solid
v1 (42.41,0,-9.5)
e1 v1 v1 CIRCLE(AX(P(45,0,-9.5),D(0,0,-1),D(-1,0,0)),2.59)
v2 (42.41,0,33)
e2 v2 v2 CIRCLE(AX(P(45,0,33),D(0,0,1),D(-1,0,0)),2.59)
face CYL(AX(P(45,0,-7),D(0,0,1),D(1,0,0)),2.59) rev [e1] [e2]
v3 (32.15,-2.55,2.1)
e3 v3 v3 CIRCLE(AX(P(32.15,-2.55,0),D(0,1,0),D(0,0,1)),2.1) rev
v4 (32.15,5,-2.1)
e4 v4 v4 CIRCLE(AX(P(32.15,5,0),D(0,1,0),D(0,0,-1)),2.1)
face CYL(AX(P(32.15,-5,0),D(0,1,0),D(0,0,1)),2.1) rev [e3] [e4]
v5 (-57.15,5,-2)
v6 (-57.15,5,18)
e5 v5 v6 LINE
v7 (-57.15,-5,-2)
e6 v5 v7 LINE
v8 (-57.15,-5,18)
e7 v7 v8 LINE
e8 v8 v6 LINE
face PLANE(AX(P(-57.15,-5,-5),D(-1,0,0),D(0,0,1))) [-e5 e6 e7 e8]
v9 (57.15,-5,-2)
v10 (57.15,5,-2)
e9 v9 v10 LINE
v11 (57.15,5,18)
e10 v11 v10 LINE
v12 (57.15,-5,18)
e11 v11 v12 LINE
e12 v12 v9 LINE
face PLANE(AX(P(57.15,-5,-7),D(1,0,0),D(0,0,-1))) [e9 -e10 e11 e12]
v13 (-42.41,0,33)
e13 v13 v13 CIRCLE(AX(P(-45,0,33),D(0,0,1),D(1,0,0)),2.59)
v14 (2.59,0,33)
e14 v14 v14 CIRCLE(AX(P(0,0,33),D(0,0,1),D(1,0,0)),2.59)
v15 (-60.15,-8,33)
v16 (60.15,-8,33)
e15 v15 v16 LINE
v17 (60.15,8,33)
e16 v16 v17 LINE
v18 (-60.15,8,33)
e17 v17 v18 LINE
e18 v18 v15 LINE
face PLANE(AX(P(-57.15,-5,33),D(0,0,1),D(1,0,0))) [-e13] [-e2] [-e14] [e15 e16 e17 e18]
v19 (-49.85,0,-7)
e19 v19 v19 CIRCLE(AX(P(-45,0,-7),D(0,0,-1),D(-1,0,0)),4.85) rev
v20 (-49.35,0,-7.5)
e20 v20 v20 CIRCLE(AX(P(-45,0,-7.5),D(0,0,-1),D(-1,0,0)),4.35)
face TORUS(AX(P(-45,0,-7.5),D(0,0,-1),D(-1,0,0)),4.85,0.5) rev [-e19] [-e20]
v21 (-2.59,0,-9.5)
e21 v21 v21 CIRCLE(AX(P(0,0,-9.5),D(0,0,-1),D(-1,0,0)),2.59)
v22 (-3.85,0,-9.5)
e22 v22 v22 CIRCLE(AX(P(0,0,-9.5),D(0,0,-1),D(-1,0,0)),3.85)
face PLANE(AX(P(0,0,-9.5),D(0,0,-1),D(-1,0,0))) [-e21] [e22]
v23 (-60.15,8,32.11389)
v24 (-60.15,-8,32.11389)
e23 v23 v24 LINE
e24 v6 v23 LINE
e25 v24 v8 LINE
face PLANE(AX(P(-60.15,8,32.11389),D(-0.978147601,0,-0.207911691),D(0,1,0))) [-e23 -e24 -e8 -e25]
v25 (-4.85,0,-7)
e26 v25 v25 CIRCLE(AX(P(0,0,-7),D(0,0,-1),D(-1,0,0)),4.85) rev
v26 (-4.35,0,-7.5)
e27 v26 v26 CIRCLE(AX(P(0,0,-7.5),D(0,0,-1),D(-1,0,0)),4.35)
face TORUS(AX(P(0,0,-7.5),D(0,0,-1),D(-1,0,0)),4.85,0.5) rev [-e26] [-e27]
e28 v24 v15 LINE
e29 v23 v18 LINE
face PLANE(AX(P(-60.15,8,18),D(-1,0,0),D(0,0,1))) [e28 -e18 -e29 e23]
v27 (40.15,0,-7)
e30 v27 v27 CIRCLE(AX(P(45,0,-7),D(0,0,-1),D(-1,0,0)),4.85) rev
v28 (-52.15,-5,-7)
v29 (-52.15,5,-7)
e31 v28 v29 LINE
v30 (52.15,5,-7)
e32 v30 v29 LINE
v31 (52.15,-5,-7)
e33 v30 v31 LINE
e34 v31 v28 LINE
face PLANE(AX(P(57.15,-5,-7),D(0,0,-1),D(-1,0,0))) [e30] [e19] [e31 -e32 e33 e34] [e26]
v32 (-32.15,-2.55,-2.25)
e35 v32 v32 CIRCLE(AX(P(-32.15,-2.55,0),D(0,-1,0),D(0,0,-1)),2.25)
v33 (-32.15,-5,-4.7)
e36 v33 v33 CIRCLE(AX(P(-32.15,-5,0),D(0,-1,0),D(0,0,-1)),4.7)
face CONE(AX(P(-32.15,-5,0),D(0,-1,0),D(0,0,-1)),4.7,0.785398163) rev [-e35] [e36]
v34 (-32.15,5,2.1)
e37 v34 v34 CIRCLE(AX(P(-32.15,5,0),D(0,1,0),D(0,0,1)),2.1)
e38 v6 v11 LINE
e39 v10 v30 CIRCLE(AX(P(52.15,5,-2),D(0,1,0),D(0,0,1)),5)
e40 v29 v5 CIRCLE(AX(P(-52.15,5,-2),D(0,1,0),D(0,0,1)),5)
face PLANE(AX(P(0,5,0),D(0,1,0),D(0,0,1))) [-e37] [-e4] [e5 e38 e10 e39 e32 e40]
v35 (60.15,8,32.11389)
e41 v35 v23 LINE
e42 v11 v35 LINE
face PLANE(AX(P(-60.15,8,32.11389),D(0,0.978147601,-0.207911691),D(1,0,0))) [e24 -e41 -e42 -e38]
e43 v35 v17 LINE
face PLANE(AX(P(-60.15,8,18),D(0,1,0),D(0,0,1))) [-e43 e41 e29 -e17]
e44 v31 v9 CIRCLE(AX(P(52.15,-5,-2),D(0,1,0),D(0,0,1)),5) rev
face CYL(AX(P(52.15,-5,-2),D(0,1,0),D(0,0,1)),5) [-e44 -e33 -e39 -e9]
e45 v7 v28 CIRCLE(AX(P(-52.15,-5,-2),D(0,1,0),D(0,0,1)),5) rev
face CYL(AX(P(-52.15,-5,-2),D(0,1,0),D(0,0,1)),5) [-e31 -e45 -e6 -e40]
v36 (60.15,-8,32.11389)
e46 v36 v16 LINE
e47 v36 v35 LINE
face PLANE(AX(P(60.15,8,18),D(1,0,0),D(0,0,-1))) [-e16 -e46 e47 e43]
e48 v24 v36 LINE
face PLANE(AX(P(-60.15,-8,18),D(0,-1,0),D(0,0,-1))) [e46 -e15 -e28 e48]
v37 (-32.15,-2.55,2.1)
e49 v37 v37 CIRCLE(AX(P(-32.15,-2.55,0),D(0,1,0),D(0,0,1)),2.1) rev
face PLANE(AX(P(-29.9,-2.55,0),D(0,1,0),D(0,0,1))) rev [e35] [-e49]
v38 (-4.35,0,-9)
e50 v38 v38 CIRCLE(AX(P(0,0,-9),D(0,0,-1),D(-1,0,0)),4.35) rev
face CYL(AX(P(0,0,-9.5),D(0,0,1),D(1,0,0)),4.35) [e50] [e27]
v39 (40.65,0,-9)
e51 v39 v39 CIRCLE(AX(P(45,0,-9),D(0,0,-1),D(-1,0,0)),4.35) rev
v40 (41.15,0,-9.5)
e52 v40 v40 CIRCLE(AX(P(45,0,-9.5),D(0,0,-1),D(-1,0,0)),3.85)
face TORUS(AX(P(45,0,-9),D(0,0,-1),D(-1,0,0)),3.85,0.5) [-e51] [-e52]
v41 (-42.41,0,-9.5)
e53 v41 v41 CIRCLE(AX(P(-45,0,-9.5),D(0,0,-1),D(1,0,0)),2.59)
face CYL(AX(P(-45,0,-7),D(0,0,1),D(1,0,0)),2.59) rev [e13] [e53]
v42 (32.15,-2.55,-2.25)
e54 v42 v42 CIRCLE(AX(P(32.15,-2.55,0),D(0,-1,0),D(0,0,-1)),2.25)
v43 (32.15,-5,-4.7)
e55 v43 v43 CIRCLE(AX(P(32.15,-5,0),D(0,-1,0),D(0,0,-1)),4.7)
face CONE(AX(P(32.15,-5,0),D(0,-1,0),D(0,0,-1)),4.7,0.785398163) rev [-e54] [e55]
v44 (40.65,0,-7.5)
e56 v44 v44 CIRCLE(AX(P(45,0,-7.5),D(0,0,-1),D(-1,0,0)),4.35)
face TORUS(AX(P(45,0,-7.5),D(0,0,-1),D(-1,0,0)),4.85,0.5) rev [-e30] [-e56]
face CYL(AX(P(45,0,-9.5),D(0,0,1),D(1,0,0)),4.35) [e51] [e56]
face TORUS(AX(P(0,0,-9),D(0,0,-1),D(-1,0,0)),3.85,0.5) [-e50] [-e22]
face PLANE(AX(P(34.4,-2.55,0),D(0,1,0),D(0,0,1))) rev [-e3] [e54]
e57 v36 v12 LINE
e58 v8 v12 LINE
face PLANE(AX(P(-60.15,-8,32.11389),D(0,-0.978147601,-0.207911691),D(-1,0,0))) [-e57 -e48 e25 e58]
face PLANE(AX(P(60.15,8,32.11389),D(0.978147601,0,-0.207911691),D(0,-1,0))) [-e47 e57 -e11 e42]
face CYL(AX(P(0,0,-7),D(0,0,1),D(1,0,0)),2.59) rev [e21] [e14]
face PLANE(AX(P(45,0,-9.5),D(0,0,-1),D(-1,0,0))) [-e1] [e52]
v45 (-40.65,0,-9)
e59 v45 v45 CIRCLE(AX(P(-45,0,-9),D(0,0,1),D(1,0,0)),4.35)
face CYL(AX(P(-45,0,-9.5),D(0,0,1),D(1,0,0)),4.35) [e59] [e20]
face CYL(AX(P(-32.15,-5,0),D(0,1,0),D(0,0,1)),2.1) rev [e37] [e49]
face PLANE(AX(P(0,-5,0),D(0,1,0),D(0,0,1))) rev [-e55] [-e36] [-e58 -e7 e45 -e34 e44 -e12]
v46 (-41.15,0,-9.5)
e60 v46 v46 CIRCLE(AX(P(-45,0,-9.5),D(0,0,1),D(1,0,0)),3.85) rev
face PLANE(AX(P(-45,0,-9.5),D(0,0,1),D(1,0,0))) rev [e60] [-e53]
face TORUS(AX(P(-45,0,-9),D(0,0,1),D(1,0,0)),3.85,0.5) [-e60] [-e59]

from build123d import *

# Parameters (mm, degrees)
BOSS_EXTRUDE1_DEPTH      = 5
BOSS_EXTRUDE1_DEPTH_BACK = 5
SKETCH2_R                = 2.1
FILLET1_R                = 5
SKETCH14_W               = 120.3
SKETCH14_H               = 16
BOSS_EXTRUDE3_DEPTH      = 15
F_5MBOLTS_DEPTH          = 70.07258863
F_5MBOLTS_DEPTH_BACK     = 70.07258863
SKETCH12_R               = 2.59
SKETCH13_R               = 4.35
SKETCH13_R_2             = 2.59
TOPWASHER_DEPTH          = 2.5
WASHERFILLET_R           = 0.5
CHAMFER1_SIZE            = 3
CHAMFER1_SIZE_2          = 14.113890328


# Read off the part's stored shape, not the designer's step: AdvancedHole1, AdvancedHole2
with BuildPart() as part:
    # Sketch2 → Boss-Extrude1 (new, two sides: drawn at the far end of the back side and taken through both)
    with BuildSketch(Plane(origin=(0, 0, 0), x_dir=(1, 0, 0), z_dir=(0, 1, 0)).offset(-BOSS_EXTRUDE1_DEPTH_BACK)):
        Polygon((-57.15, 5), (-57.15, -33), (57.15, -33), (57.15, 5), (57.15, 7), (-57.15, 7), align=None)
        with Locations(Location((-32.15, 0, 0), (0, 0, 270))):
            Circle(SKETCH2_R, mode=Mode.SUBTRACT)
        with Locations(Location((32.15, 0, 0), (0, 0, 90))):
            Circle(SKETCH2_R, mode=Mode.SUBTRACT)
    extrude(amount=BOSS_EXTRUDE1_DEPTH + BOSS_EXTRUDE1_DEPTH_BACK)

    # AdvancedHole1 outline → AdvancedHole1 (revolve, cut)
    with BuildSketch(Plane(origin=(32.15, 0, 0), x_dir=(1, 0, 0), z_dir=(0, 0, 1))):
        Polygon((2.25, -2.55), (2.1, -2.55), (2.1, -5), (4.7, -5), align=None)
    revolve(axis=Axis((32.15, 0, 0), (0, 1, 0)), mode=Mode.SUBTRACT)

    # AdvancedHole2 outline → AdvancedHole2 (revolve, cut)
    with BuildSketch(Plane(origin=(-32.15, 0, 0), x_dir=(1, 0, 0), z_dir=(0, 0, 1))):
        Polygon((2.25, -2.55), (2.1, -2.55), (2.1, -5), (4.7, -5), align=None)
    revolve(axis=Axis((-32.15, 0, 0), (0, 1, 0)), mode=Mode.SUBTRACT)

    # Fillet1
    fillet1_edges = [part.edges().sort_by_distance(p)[0] for p in [
        (-57.15, 0, -7),
        (57.15, 0, -7),
    ]]
    fillet(fillet1_edges, radius=FILLET1_R)

    # Sketch14 → Boss-Extrude3 (add)
    with BuildSketch(Plane.XY.offset(33)):
        Rectangle(SKETCH14_W, SKETCH14_H)
    extrude(amount=-BOSS_EXTRUDE3_DEPTH)

    # Sketch12 → 5mBolts (cut, two sides: drawn at the far end of the back side and taken through both)
    with BuildSketch(Plane.XY.offset(-F_5MBOLTS_DEPTH_BACK)):
        with Locations((-45, 0)):
            Circle(SKETCH12_R)
        with Locations(Location((45, 0, 0), (0, 0, 180))):
            Circle(SKETCH12_R)
        Circle(SKETCH12_R)
    extrude(amount=F_5MBOLTS_DEPTH + F_5MBOLTS_DEPTH_BACK, mode=Mode.SUBTRACT)

    # Sketch13 → TopWasher (add)
    # profile 1 of 3: a face of its own
    with BuildSketch(Plane(origin=(0, 0, -7), x_dir=(-1, 0, 0), z_dir=(0, 0, -1))):
        with Locations((-45, 0)):
            Circle(SKETCH13_R)
        with Locations((-45, 0)):
            Circle(SKETCH13_R_2, mode=Mode.SUBTRACT)
    # profile 2 of 3: a face of its own
    with BuildSketch(Plane(origin=(0, 0, -7), x_dir=(-1, 0, 0), z_dir=(0, 0, -1))):
        with Locations(Location((45, 0, 0), (0, 0, 180))):
            Circle(SKETCH13_R)
        with Locations(Location((45, 0, 0), (0, 0, 180))):
            Circle(SKETCH13_R_2, mode=Mode.SUBTRACT)
    # profile 3 of 3: a face of its own
    with BuildSketch(Plane(origin=(0, 0, -7), x_dir=(-1, 0, 0), z_dir=(0, 0, -1))):
        Circle(SKETCH13_R)
        with Locations(Location((0, 0, 0), (0, 0, 180))):
            Circle(SKETCH13_R_2, mode=Mode.SUBTRACT)
    extrude(amount=TOPWASHER_DEPTH)

    # WasherFillet
    washerfillet_edges = [part.edges().sort_by_distance(p)[0] for p in [
        (49.35, 0, -9.5),
        (49.35, 0, -7),
        (-49.35, 0, -9.5),
        (-49.35, 0, -7),
        (4.35, 0, -9.5),
        (4.35, 0, -7),
    ]]
    fillet(washerfillet_edges, radius=WASHERFILLET_R)

    # Chamfer1
    # the kernel refuses this chamfer: 14.113890328, 3 mm, written as the material it takes off along each edge
    with BuildSketch(Plane(origin=(-60.15, -44.666446864, 18), x_dir=(0.984670194927414, 0, -0.17442650951506342), z_dir=(0, 1, 0))) as chamfer1_piece_1_section:
        Polygon((CHAMFER1_SIZE * 0.984670194927, -CHAMFER1_SIZE * 0.174426509515), (-CHAMFER1_SIZE_2 * 0.17442650952, -CHAMFER1_SIZE_2 * 0.984670194958), (0, 0), align=None)
    chamfer1_piece_1 = extrude(amount=89.332893728, mode=Mode.PRIVATE)
    chamfer1_piece_1 = split(chamfer1_piece_1, bisect_by=Plane(origin=(-59.308334222, -5, 23.00362874), z_dir=(0, -1, 0)), keep=Keep.TOP, mode=Mode.PRIVATE)
    chamfer1_piece_1 = split(chamfer1_piece_1, bisect_by=Plane(origin=(-57.15, -24.833223432, 23.00362874), z_dir=(-1, 0, 0)), keep=Keep.TOP, mode=Mode.PRIVATE)
    add(chamfer1_piece_1, mode=Mode.SUBTRACT)
    with BuildSketch(Plane(origin=(-60.15, -44.666446864, 18), x_dir=(0.984670194927414, 0, -0.17442650951506342), z_dir=(0, 1, 0))) as chamfer1_piece_2_section:
        Polygon((CHAMFER1_SIZE * 0.984670194927, -CHAMFER1_SIZE * 0.174426509515), (-CHAMFER1_SIZE_2 * 0.17442650952, -CHAMFER1_SIZE_2 * 0.984670194958), (0, 0), align=None)
    chamfer1_piece_2 = extrude(amount=89.332893728, mode=Mode.PRIVATE)
    chamfer1_piece_2 = split(chamfer1_piece_2, bisect_by=Plane(origin=(-59.308334222, 5, 23.00362874), z_dir=(0, -1, 0)), keep=Keep.TOP, mode=Mode.PRIVATE)
    chamfer1_piece_2 = split(chamfer1_piece_2, bisect_by=Plane(origin=(-59.308334222, -5, 23.00362874), z_dir=(0, 1, 0)), keep=Keep.TOP, mode=Mode.PRIVATE)
    chamfer1_piece_2 = split(chamfer1_piece_2, bisect_by=Plane(origin=(-57.15, 0, 23.00362874), z_dir=(-1, 0, 0)), keep=Keep.TOP, mode=Mode.PRIVATE)
    add(chamfer1_piece_2, mode=Mode.SUBTRACT)
    with BuildSketch(Plane(origin=(-60.15, -44.666446864, 18), x_dir=(0.984670194927414, 0, -0.17442650951506342), z_dir=(0, 1, 0))) as chamfer1_piece_3_section:
        Polygon((CHAMFER1_SIZE * 0.984670194927, -CHAMFER1_SIZE * 0.174426509515), (-CHAMFER1_SIZE_2 * 0.17442650952, -CHAMFER1_SIZE_2 * 0.984670194958), (0, 0), align=None)
    chamfer1_piece_3 = extrude(amount=89.332893728, mode=Mode.PRIVATE)
    chamfer1_piece_3 = split(chamfer1_piece_3, bisect_by=Plane(origin=(-59.308334222, 5, 23.00362874), z_dir=(0, 1, 0)), keep=Keep.TOP, mode=Mode.PRIVATE)
    chamfer1_piece_3 = split(chamfer1_piece_3, bisect_by=Plane(origin=(-57.15, 24.833223432, 23.00362874), z_dir=(-1, 0, 0)), keep=Keep.TOP, mode=Mode.PRIVATE)
    add(chamfer1_piece_3, mode=Mode.SUBTRACT)
    with BuildSketch(Plane(origin=(-96.816446864, 8, 18), x_dir=(0, -0.984670194927414, -0.17442650951506347), z_dir=(1, 0, 0))) as chamfer1_piece_4_section:
        Polygon((CHAMFER1_SIZE * 0.984670194927, -CHAMFER1_SIZE * 0.174426509515), (-CHAMFER1_SIZE_2 * 0.17442650952, -CHAMFER1_SIZE_2 * 0.984670194958), (0, 0), align=None)
    chamfer1_piece_4 = extrude(amount=193.632893728, mode=Mode.PRIVATE)
    chamfer1_piece_4 = split(chamfer1_piece_4, bisect_by=Plane(origin=(-76.983223432, 5, 23.00362874), z_dir=(0, 1, 0)), keep=Keep.TOP, mode=Mode.PRIVATE)
    chamfer1_piece_4 = split(chamfer1_piece_4, bisect_by=Plane(origin=(-57.15, 7.158334222, 23.00362874), z_dir=(-1, 0, 0)), keep=Keep.TOP, mode=Mode.PRIVATE)
    add(chamfer1_piece_4, mode=Mode.SUBTRACT)
    with BuildSketch(Plane(origin=(-96.816446864, 8, 18), x_dir=(0, -0.984670194927414, -0.17442650951506347), z_dir=(1, 0, 0))) as chamfer1_piece_5_section:
        Polygon((CHAMFER1_SIZE * 0.984670194927, -CHAMFER1_SIZE * 0.174426509515), (-CHAMFER1_SIZE_2 * 0.17442650952, -CHAMFER1_SIZE_2 * 0.984670194958), (0, 0), align=None)
    chamfer1_piece_5 = extrude(amount=193.632893728, mode=Mode.PRIVATE)
    chamfer1_piece_5 = split(chamfer1_piece_5, bisect_by=Plane(origin=(0, 5, 23.00362874), z_dir=(0, 1, 0)), keep=Keep.TOP, mode=Mode.PRIVATE)
    chamfer1_piece_5 = split(chamfer1_piece_5, bisect_by=Plane(origin=(-57.15, 7.158334222, 23.00362874), z_dir=(1, 0, 0)), keep=Keep.TOP, mode=Mode.PRIVATE)
    chamfer1_piece_5 = split(chamfer1_piece_5, bisect_by=Plane(origin=(57.15, 7.158334222, 23.00362874), z_dir=(-1, 0, 0)), keep=Keep.TOP, mode=Mode.PRIVATE)
    add(chamfer1_piece_5, mode=Mode.SUBTRACT)
    with BuildSketch(Plane(origin=(-96.816446864, 8, 18), x_dir=(0, -0.984670194927414, -0.17442650951506347), z_dir=(1, 0, 0))) as chamfer1_piece_6_section:
        Polygon((CHAMFER1_SIZE * 0.984670194927, -CHAMFER1_SIZE * 0.174426509515), (-CHAMFER1_SIZE_2 * 0.17442650952, -CHAMFER1_SIZE_2 * 0.984670194958), (0, 0), align=None)
    chamfer1_piece_6 = extrude(amount=193.632893728, mode=Mode.PRIVATE)
    chamfer1_piece_6 = split(chamfer1_piece_6, bisect_by=Plane(origin=(76.983223432, 5, 23.00362874), z_dir=(0, 1, 0)), keep=Keep.TOP, mode=Mode.PRIVATE)
    chamfer1_piece_6 = split(chamfer1_piece_6, bisect_by=Plane(origin=(57.15, 7.158334222, 23.00362874), z_dir=(1, 0, 0)), keep=Keep.TOP, mode=Mode.PRIVATE)
    add(chamfer1_piece_6, mode=Mode.SUBTRACT)
    with BuildSketch(Plane(origin=(60.15, 44.666446864, 18), x_dir=(-0.984670194927414, 0, -0.17442650951506342), z_dir=(0, -1, 0))) as chamfer1_piece_7_section:
        Polygon((CHAMFER1_SIZE * 0.984670194927, -CHAMFER1_SIZE * 0.174426509515), (-CHAMFER1_SIZE_2 * 0.17442650952, -CHAMFER1_SIZE_2 * 0.984670194958), (0, 0), align=None)
    chamfer1_piece_7 = extrude(amount=89.332893728, mode=Mode.PRIVATE)
    chamfer1_piece_7 = split(chamfer1_piece_7, bisect_by=Plane(origin=(59.308334222, 5, 23.00362874), z_dir=(0, 1, 0)), keep=Keep.TOP, mode=Mode.PRIVATE)
    chamfer1_piece_7 = split(chamfer1_piece_7, bisect_by=Plane(origin=(57.15, 24.833223432, 23.00362874), z_dir=(1, 0, 0)), keep=Keep.TOP, mode=Mode.PRIVATE)
    add(chamfer1_piece_7, mode=Mode.SUBTRACT)
    with BuildSketch(Plane(origin=(60.15, 44.666446864, 18), x_dir=(-0.984670194927414, 0, -0.17442650951506342), z_dir=(0, -1, 0))) as chamfer1_piece_8_section:
        Polygon((CHAMFER1_SIZE * 0.984670194927, -CHAMFER1_SIZE * 0.174426509515), (-CHAMFER1_SIZE_2 * 0.17442650952, -CHAMFER1_SIZE_2 * 0.984670194958), (0, 0), align=None)
    chamfer1_piece_8 = extrude(amount=89.332893728, mode=Mode.PRIVATE)
    chamfer1_piece_8 = split(chamfer1_piece_8, bisect_by=Plane(origin=(59.308334222, 5, 23.00362874), z_dir=(0, -1, 0)), keep=Keep.TOP, mode=Mode.PRIVATE)
    chamfer1_piece_8 = split(chamfer1_piece_8, bisect_by=Plane(origin=(59.308334222, -5, 23.00362874), z_dir=(0, 1, 0)), keep=Keep.TOP, mode=Mode.PRIVATE)
    chamfer1_piece_8 = split(chamfer1_piece_8, bisect_by=Plane(origin=(57.15, 0, 23.00362874), z_dir=(1, 0, 0)), keep=Keep.TOP, mode=Mode.PRIVATE)
    add(chamfer1_piece_8, mode=Mode.SUBTRACT)
    with BuildSketch(Plane(origin=(60.15, 44.666446864, 18), x_dir=(-0.984670194927414, 0, -0.17442650951506342), z_dir=(0, -1, 0))) as chamfer1_piece_9_section:
        Polygon((CHAMFER1_SIZE * 0.984670194927, -CHAMFER1_SIZE * 0.174426509515), (-CHAMFER1_SIZE_2 * 0.17442650952, -CHAMFER1_SIZE_2 * 0.984670194958), (0, 0), align=None)
    chamfer1_piece_9 = extrude(amount=89.332893728, mode=Mode.PRIVATE)
    chamfer1_piece_9 = split(chamfer1_piece_9, bisect_by=Plane(origin=(59.308334222, -5, 23.00362874), z_dir=(0, -1, 0)), keep=Keep.TOP, mode=Mode.PRIVATE)
    chamfer1_piece_9 = split(chamfer1_piece_9, bisect_by=Plane(origin=(57.15, -24.833223432, 23.00362874), z_dir=(1, 0, 0)), keep=Keep.TOP, mode=Mode.PRIVATE)
    add(chamfer1_piece_9, mode=Mode.SUBTRACT)
    with BuildSketch(Plane(origin=(96.816446864, -8, 18), x_dir=(0, 0.984670194927414, -0.17442650951506347), z_dir=(-1, 0, 0))) as chamfer1_piece_10_section:
        Polygon((CHAMFER1_SIZE * 0.984670194927, -CHAMFER1_SIZE * 0.174426509515), (-CHAMFER1_SIZE_2 * 0.17442650952, -CHAMFER1_SIZE_2 * 0.984670194958), (0, 0), align=None)
    chamfer1_piece_10 = extrude(amount=193.632893728, mode=Mode.PRIVATE)
    chamfer1_piece_10 = split(chamfer1_piece_10, bisect_by=Plane(origin=(76.983223432, -5, 23.00362874), z_dir=(0, -1, 0)), keep=Keep.TOP, mode=Mode.PRIVATE)
    chamfer1_piece_10 = split(chamfer1_piece_10, bisect_by=Plane(origin=(57.15, -7.158334222, 23.00362874), z_dir=(1, 0, 0)), keep=Keep.TOP, mode=Mode.PRIVATE)
    add(chamfer1_piece_10, mode=Mode.SUBTRACT)
    with BuildSketch(Plane(origin=(96.816446864, -8, 18), x_dir=(0, 0.984670194927414, -0.17442650951506347), z_dir=(-1, 0, 0))) as chamfer1_piece_11_section:
        Polygon((CHAMFER1_SIZE * 0.984670194927, -CHAMFER1_SIZE * 0.174426509515), (-CHAMFER1_SIZE_2 * 0.17442650952, -CHAMFER1_SIZE_2 * 0.984670194958), (0, 0), align=None)
    chamfer1_piece_11 = extrude(amount=193.632893728, mode=Mode.PRIVATE)
    chamfer1_piece_11 = split(chamfer1_piece_11, bisect_by=Plane(origin=(0, -5, 23.00362874), z_dir=(0, -1, 0)), keep=Keep.TOP, mode=Mode.PRIVATE)
    chamfer1_piece_11 = split(chamfer1_piece_11, bisect_by=Plane(origin=(-57.15, -7.158334222, 23.00362874), z_dir=(1, 0, 0)), keep=Keep.TOP, mode=Mode.PRIVATE)
    chamfer1_piece_11 = split(chamfer1_piece_11, bisect_by=Plane(origin=(57.15, -7.158334222, 23.00362874), z_dir=(-1, 0, 0)), keep=Keep.TOP, mode=Mode.PRIVATE)
    add(chamfer1_piece_11, mode=Mode.SUBTRACT)
    with BuildSketch(Plane(origin=(96.816446864, -8, 18), x_dir=(0, 0.984670194927414, -0.17442650951506347), z_dir=(-1, 0, 0))) as chamfer1_piece_12_section:
        Polygon((CHAMFER1_SIZE * 0.984670194927, -CHAMFER1_SIZE * 0.174426509515), (-CHAMFER1_SIZE_2 * 0.17442650952, -CHAMFER1_SIZE_2 * 0.984670194958), (0, 0), align=None)
    chamfer1_piece_12 = extrude(amount=193.632893728, mode=Mode.PRIVATE)
    chamfer1_piece_12 = split(chamfer1_piece_12, bisect_by=Plane(origin=(-76.983223432, -5, 23.00362874), z_dir=(0, -1, 0)), keep=Keep.TOP, mode=Mode.PRIVATE)
    chamfer1_piece_12 = split(chamfer1_piece_12, bisect_by=Plane(origin=(-57.15, -7.158334222, 23.00362874), z_dir=(-1, 0, 0)), keep=Keep.TOP, mode=Mode.PRIVATE)
    add(chamfer1_piece_12, mode=Mode.SUBTRACT)


solid = part.part
